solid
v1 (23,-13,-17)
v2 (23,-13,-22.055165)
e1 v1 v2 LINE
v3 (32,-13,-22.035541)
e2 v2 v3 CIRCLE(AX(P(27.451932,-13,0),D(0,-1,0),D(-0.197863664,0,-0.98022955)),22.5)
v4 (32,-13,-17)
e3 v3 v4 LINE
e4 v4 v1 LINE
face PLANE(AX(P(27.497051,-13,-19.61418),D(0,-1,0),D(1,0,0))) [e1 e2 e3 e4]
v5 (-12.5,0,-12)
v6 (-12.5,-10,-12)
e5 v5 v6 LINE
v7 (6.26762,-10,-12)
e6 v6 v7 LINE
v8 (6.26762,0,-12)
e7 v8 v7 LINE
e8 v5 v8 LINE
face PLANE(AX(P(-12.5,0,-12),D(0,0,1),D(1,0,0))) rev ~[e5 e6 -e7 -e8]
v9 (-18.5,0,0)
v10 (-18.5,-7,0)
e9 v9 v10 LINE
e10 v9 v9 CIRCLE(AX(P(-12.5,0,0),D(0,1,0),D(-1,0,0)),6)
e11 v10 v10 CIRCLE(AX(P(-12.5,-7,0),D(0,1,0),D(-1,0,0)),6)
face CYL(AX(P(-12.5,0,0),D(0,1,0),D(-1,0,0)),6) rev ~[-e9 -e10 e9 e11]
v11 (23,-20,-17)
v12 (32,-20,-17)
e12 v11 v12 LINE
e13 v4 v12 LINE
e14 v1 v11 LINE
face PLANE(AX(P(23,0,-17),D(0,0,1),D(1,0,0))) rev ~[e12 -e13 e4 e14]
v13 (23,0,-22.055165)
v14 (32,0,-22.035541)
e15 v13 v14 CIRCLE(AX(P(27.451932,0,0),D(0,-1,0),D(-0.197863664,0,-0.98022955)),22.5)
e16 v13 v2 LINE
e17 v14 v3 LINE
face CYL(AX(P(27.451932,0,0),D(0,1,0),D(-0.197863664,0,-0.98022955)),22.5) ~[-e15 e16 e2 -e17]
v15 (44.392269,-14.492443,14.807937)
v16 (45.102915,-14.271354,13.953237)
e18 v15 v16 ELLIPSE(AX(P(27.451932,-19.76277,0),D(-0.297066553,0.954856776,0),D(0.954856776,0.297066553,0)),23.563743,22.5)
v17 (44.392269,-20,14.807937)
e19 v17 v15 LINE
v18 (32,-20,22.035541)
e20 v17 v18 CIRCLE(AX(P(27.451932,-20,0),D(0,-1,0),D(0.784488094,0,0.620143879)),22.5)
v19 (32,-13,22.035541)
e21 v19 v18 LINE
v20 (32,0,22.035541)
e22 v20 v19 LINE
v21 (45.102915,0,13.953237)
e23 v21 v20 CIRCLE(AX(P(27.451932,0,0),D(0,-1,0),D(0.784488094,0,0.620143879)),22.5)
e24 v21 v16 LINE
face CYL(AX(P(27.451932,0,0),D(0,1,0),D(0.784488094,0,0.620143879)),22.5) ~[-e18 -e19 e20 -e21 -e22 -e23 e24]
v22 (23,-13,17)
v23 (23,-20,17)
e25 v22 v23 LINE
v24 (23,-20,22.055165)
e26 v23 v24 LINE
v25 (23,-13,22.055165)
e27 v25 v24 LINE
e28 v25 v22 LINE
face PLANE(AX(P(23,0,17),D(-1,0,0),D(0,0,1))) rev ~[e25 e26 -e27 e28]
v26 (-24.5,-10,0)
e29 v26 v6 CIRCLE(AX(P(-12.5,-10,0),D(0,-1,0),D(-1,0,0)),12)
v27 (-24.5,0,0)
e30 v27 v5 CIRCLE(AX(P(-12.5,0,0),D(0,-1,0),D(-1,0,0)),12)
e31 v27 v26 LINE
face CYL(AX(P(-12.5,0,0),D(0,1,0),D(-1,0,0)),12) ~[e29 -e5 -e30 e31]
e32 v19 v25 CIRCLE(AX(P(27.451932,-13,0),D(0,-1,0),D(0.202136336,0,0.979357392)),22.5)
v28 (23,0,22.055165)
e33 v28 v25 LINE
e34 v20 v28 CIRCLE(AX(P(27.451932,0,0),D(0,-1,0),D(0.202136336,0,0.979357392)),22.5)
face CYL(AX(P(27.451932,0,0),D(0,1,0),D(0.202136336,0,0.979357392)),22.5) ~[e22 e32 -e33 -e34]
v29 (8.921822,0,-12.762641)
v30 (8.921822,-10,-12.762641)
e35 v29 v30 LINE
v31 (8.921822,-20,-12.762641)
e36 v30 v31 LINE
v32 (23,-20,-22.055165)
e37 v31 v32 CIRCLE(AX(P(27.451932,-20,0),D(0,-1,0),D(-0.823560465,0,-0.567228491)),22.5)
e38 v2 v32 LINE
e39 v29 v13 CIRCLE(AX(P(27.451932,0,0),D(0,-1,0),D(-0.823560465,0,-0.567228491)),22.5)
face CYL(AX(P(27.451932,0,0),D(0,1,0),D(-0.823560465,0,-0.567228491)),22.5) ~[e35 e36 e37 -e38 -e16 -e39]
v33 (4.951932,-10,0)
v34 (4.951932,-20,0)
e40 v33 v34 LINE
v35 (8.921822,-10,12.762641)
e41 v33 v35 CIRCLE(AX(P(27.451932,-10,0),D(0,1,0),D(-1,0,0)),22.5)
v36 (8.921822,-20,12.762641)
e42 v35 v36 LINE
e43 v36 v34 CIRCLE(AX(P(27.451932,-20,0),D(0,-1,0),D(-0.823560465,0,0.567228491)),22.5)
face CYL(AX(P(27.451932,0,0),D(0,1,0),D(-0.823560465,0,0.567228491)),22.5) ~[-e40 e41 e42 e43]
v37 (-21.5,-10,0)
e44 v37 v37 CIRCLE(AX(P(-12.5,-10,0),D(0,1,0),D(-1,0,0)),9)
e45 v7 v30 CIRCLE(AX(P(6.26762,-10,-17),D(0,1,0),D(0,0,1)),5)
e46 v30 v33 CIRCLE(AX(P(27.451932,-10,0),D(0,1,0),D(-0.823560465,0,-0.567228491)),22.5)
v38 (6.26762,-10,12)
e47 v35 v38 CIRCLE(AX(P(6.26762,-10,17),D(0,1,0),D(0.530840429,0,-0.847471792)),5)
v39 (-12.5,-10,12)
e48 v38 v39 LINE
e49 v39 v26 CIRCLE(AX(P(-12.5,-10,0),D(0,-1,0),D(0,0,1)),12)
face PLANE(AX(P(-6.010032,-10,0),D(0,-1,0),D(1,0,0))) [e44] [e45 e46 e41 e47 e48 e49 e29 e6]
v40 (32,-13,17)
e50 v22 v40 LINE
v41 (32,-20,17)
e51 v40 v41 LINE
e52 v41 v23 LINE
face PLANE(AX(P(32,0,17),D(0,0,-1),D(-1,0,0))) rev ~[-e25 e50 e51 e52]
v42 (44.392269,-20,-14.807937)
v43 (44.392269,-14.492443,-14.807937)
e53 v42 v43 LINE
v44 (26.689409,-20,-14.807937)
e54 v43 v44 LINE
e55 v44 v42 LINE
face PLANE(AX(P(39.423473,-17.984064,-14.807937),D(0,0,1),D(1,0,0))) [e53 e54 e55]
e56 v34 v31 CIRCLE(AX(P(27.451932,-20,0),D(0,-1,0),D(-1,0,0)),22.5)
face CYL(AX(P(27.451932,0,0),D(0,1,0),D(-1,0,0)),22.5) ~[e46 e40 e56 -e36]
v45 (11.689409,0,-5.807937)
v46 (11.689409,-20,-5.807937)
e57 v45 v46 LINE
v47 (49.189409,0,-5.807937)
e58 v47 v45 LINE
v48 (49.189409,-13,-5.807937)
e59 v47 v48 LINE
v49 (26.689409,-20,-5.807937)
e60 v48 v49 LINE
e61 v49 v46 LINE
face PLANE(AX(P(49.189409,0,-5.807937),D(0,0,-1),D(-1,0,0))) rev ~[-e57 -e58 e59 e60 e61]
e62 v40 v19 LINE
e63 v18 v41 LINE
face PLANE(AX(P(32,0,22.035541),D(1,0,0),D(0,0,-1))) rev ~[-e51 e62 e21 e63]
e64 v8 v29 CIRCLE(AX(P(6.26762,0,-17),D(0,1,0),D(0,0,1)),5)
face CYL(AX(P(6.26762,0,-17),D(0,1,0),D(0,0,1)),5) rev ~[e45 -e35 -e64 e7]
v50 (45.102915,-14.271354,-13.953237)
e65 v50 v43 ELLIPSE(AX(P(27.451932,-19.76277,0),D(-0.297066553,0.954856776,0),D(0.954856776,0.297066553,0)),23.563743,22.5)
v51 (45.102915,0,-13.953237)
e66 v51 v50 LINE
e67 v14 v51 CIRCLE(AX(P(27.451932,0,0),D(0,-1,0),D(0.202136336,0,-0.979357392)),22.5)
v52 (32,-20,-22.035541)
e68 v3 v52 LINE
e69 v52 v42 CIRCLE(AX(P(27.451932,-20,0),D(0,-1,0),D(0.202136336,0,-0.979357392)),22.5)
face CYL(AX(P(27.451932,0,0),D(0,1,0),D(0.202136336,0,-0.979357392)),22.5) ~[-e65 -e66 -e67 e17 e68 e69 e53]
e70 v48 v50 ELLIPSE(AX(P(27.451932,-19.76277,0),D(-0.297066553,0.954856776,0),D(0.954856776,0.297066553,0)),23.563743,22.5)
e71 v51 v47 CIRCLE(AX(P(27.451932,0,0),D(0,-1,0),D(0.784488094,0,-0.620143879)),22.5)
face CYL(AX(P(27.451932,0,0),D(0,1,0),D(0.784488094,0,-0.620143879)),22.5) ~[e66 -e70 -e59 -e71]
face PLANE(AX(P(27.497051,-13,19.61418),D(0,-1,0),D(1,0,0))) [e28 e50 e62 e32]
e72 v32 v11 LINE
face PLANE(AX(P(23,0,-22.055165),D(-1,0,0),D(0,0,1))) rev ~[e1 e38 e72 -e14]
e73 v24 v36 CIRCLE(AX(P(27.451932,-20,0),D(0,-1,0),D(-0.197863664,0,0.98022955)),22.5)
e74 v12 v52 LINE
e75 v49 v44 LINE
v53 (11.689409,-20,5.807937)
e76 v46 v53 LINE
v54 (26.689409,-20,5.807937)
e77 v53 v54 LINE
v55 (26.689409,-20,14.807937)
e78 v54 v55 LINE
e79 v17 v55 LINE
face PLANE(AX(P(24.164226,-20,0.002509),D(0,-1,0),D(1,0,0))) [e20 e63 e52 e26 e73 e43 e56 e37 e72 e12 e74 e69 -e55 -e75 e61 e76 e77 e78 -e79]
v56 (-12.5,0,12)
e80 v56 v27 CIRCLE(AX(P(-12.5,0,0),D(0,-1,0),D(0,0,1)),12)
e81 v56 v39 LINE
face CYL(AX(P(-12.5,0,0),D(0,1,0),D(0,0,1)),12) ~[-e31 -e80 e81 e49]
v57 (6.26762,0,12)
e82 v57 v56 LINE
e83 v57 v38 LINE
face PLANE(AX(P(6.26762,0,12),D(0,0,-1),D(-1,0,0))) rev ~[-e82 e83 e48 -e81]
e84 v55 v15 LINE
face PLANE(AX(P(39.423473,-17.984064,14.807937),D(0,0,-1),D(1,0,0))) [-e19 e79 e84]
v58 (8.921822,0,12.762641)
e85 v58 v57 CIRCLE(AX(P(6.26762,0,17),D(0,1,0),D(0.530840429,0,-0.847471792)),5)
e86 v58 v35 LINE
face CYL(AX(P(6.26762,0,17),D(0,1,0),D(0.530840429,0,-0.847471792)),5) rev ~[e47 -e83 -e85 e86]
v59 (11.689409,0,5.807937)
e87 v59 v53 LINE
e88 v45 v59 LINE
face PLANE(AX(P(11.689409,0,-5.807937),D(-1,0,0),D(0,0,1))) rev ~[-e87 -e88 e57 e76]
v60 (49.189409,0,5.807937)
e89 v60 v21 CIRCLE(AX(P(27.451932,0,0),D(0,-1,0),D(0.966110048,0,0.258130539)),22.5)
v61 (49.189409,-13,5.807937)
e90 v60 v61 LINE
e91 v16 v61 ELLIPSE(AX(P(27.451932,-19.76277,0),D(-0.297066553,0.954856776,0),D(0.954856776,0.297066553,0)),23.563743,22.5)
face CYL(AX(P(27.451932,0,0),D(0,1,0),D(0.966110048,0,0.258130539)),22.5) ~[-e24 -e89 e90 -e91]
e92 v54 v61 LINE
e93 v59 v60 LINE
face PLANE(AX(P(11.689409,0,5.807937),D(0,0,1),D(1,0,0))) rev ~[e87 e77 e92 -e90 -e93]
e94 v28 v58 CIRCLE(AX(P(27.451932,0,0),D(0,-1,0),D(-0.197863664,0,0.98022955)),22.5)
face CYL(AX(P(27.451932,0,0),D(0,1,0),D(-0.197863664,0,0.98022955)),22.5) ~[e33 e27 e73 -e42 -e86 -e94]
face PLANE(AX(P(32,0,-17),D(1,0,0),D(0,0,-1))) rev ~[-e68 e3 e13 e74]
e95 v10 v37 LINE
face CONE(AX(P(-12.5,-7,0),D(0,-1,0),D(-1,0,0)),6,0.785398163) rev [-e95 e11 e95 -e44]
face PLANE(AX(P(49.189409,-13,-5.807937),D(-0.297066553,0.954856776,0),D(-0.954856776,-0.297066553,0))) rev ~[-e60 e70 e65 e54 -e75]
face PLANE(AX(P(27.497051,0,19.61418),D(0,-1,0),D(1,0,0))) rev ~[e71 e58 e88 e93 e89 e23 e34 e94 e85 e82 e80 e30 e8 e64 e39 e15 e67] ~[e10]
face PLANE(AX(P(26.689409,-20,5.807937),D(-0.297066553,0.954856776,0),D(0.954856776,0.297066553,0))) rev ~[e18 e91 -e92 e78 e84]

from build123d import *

# Parameters (mm, degrees)
F1_DEPTH = 10
F2_SIZE2 = 3
F2_SIZE  = 3
F3_DEPTH = 20
F4_DEPTH = 13
F6_DEPTH = 9
F8_DEPTH = 9


# Not quite as in the source:
# - after a boolean that leaves OpenCascade's solid faulty, fix() repairs it


with BuildPart() as f1:
    # F0 (on Front) → F1 (new body)
    with BuildSketch(Plane.XZ):
        with BuildLine():
            ThreePointArc((-12.5, 12), (-20.9852813742, 8.4852813742), (-24.5, 0))
            ThreePointArc((-24.5, 0), (-20.9852813742, -8.4852813742), (-12.5, -12))
            Line((-12.5, -12), (6.2676198227, -12))
            ThreePointArc((6.2676198227, -12), (7.6484176342, -12.1944409895), (8.9218219686, -12.7626410385))
            ThreePointArc((8.9218219686, -12.7626410385), (5.9673160107, -6.6829078481), (4.9519324303, 0))
            ThreePointArc((4.9519324303, 0), (5.9673160107, 6.6829078481), (8.9218219686, 12.7626410385))
            ThreePointArc((8.9218219686, 12.7626410385), (7.6484176342, 12.1944409895), (6.2676198227, 12))
            Line((6.2676198227, 12), (-12.5, 12))
        make_face()
        with BuildLine():
            ThreePointArc((-3.5, 0), (-12.5, -9), (-21.5, 0))
            ThreePointArc((-21.5, 0), (-12.5, 9), (-3.5, 0))
        make_face(mode=Mode.SUBTRACT)
        with BuildLine():
            ThreePointArc((-3.5, 0), (-12.5, 9), (-21.5, 0))
            ThreePointArc((-21.5, 0), (-12.5, -9), (-3.5, 0))
        make_face()
        with BuildLine():
            ThreePointArc((-6.5, 0), (-12.5, -6), (-18.5, 0))
            ThreePointArc((-18.5, 0), (-12.5, 6), (-6.5, 0))
        make_face(mode=Mode.SUBTRACT)
    extrude(amount=F1_DEPTH)

    # F2
    f2_edges = [f1.edges().sort_by_distance(p)[0] for p in [
        (-6.5, -10, 0),
    ]]
    chamfer(f2_edges, length=F2_SIZE, length2=F2_SIZE2)

    # F0 (on Front) → F3 (join)
    with BuildSketch(Plane.XZ):
        with BuildLine():
            ThreePointArc((4.9519324303, 0), (5.9673160107, -6.6829078481), (8.9218219686, -12.7626410385))
            ThreePointArc((8.9218219686, -12.7626410385), (15.0571220775, -18.7781435802), (23, -22.0551648744))
            Line((23, -22.0551648744), (23, -17))
            Line((23, -17), (27.5, -17))
            Line((27.5, -17), (32, -17))
            Line((32, -17), (32, -22.0355413226))
            ThreePointArc((32, -22.0355413226), (39.2642294703, -19.1499252907), (45.1029145419, -13.9532372766))
            Line((45.1029145419, -13.9532372766), (27.4519324303, -13.9532372766))
            Line((27.4519324303, -13.9532372766), (27.4519324303, -5.8079371229))
            Line((27.4519324303, -5.8079371229), (11.6894085114, -5.8079371229))
            Line((11.6894085114, -5.8079371229), (11.6894085114, 0))
            Line((11.6894085114, 0), (11.6894085114, 5.8079371229))
            Line((11.6894085114, 5.8079371229), (27.5485839971, 5.8079371229))
            Line((27.5485839971, 5.8079371229), (27.4519324303, 13.9532372766))
            Line((27.4519324303, 13.9532372766), (45.1029145419, 13.9532372766))
            ThreePointArc((45.1029145419, 13.9532372766), (39.2642294703, 19.1499252907), (32, 22.0355413226))
            Line((32, 22.0355413226), (32, 17))
            Line((32, 17), (27.5, 17))
            Line((27.5, 17), (23, 17))
            Line((23, 17), (23, 22.0551648744))
            ThreePointArc((23, 22.0551648744), (15.0571220775, 18.7781435802), (8.9218219686, 12.7626410385))
            ThreePointArc((8.9218219686, 12.7626410385), (5.9673160107, 6.6829078481), (4.9519324303, 0))
        make_face()
        with BuildLine():
            ThreePointArc((49.1894085114, 5.8079371229), (47.562853303, 10.0896413044), (45.1029145419, 13.9532372766))
            Line((45.1029145419, 13.9532372766), (27.4519324303, 13.9532372766))
            Line((27.4519324303, 13.9532372766), (27.5485839971, 5.8079371229))
            Line((27.5485839971, 5.8079371229), (49.1894085114, 5.8079371229))
        make_face()
        with BuildLine():
            Line((27.4519324303, -13.9532372766), (45.1029145419, -13.9532372766))
            ThreePointArc((45.1029145419, -13.9532372766), (47.562853303, -10.0896413044), (49.1894085114, -5.8079371229))
            Line((49.1894085114, -5.8079371229), (27.4519324303, -5.8079371229))
            Line((27.4519324303, -5.8079371229), (27.4519324303, -13.9532372766))
        make_face()
    extrude(amount=F3_DEPTH)

    # F0 (on Front) → F4 (join)
    with BuildSketch(Plane.XZ):
        with BuildLine():
            ThreePointArc((32, 22.0355413226), (27.5009911931, 22.4999465163), (23, 22.0551648744))
            Line((23, 22.0551648744), (23, 17))
            Line((23, 17), (27.5, 17))
            Line((27.5, 17), (32, 17))
            Line((32, 17), (32, 22.0355413226))
        make_face()
        with BuildLine():
            Line((23, -17), (23, -22.0551648744))
            ThreePointArc((23, -22.0551648744), (27.5009911931, -22.4999465163), (32, -22.0355413226))
            Line((32, -22.0355413226), (32, -17))
            Line((32, -17), (27.5, -17))
            Line((27.5, -17), (23, -17))
        make_face()
    extrude(amount=F4_DEPTH)

    # F5 (on face) → F6 (cut)
    with BuildSketch(Plane(origin=(0, 0, 5.8079371229), x_dir=(1, 0, 0), z_dir=(0, 0, -1))):
        Polygon((49.1894085114, 13), (49.1894085114, 20), (26.6894085114, 20), align=None)
    extrude(amount=-F6_DEPTH, mode=Mode.SUBTRACT)

    # F7 (on face) → F8 (cut)
    with BuildSketch(Plane.XY.offset(-5.8079371229)):
        Polygon((26.6894085114, -20), (49.1894085114, -20), (49.1894085114, -13), align=None)
    extrude(amount=-F8_DEPTH, mode=Mode.SUBTRACT)

    add(f1.part.fix(), mode=Mode.REPLACE)


solid = f1.part
